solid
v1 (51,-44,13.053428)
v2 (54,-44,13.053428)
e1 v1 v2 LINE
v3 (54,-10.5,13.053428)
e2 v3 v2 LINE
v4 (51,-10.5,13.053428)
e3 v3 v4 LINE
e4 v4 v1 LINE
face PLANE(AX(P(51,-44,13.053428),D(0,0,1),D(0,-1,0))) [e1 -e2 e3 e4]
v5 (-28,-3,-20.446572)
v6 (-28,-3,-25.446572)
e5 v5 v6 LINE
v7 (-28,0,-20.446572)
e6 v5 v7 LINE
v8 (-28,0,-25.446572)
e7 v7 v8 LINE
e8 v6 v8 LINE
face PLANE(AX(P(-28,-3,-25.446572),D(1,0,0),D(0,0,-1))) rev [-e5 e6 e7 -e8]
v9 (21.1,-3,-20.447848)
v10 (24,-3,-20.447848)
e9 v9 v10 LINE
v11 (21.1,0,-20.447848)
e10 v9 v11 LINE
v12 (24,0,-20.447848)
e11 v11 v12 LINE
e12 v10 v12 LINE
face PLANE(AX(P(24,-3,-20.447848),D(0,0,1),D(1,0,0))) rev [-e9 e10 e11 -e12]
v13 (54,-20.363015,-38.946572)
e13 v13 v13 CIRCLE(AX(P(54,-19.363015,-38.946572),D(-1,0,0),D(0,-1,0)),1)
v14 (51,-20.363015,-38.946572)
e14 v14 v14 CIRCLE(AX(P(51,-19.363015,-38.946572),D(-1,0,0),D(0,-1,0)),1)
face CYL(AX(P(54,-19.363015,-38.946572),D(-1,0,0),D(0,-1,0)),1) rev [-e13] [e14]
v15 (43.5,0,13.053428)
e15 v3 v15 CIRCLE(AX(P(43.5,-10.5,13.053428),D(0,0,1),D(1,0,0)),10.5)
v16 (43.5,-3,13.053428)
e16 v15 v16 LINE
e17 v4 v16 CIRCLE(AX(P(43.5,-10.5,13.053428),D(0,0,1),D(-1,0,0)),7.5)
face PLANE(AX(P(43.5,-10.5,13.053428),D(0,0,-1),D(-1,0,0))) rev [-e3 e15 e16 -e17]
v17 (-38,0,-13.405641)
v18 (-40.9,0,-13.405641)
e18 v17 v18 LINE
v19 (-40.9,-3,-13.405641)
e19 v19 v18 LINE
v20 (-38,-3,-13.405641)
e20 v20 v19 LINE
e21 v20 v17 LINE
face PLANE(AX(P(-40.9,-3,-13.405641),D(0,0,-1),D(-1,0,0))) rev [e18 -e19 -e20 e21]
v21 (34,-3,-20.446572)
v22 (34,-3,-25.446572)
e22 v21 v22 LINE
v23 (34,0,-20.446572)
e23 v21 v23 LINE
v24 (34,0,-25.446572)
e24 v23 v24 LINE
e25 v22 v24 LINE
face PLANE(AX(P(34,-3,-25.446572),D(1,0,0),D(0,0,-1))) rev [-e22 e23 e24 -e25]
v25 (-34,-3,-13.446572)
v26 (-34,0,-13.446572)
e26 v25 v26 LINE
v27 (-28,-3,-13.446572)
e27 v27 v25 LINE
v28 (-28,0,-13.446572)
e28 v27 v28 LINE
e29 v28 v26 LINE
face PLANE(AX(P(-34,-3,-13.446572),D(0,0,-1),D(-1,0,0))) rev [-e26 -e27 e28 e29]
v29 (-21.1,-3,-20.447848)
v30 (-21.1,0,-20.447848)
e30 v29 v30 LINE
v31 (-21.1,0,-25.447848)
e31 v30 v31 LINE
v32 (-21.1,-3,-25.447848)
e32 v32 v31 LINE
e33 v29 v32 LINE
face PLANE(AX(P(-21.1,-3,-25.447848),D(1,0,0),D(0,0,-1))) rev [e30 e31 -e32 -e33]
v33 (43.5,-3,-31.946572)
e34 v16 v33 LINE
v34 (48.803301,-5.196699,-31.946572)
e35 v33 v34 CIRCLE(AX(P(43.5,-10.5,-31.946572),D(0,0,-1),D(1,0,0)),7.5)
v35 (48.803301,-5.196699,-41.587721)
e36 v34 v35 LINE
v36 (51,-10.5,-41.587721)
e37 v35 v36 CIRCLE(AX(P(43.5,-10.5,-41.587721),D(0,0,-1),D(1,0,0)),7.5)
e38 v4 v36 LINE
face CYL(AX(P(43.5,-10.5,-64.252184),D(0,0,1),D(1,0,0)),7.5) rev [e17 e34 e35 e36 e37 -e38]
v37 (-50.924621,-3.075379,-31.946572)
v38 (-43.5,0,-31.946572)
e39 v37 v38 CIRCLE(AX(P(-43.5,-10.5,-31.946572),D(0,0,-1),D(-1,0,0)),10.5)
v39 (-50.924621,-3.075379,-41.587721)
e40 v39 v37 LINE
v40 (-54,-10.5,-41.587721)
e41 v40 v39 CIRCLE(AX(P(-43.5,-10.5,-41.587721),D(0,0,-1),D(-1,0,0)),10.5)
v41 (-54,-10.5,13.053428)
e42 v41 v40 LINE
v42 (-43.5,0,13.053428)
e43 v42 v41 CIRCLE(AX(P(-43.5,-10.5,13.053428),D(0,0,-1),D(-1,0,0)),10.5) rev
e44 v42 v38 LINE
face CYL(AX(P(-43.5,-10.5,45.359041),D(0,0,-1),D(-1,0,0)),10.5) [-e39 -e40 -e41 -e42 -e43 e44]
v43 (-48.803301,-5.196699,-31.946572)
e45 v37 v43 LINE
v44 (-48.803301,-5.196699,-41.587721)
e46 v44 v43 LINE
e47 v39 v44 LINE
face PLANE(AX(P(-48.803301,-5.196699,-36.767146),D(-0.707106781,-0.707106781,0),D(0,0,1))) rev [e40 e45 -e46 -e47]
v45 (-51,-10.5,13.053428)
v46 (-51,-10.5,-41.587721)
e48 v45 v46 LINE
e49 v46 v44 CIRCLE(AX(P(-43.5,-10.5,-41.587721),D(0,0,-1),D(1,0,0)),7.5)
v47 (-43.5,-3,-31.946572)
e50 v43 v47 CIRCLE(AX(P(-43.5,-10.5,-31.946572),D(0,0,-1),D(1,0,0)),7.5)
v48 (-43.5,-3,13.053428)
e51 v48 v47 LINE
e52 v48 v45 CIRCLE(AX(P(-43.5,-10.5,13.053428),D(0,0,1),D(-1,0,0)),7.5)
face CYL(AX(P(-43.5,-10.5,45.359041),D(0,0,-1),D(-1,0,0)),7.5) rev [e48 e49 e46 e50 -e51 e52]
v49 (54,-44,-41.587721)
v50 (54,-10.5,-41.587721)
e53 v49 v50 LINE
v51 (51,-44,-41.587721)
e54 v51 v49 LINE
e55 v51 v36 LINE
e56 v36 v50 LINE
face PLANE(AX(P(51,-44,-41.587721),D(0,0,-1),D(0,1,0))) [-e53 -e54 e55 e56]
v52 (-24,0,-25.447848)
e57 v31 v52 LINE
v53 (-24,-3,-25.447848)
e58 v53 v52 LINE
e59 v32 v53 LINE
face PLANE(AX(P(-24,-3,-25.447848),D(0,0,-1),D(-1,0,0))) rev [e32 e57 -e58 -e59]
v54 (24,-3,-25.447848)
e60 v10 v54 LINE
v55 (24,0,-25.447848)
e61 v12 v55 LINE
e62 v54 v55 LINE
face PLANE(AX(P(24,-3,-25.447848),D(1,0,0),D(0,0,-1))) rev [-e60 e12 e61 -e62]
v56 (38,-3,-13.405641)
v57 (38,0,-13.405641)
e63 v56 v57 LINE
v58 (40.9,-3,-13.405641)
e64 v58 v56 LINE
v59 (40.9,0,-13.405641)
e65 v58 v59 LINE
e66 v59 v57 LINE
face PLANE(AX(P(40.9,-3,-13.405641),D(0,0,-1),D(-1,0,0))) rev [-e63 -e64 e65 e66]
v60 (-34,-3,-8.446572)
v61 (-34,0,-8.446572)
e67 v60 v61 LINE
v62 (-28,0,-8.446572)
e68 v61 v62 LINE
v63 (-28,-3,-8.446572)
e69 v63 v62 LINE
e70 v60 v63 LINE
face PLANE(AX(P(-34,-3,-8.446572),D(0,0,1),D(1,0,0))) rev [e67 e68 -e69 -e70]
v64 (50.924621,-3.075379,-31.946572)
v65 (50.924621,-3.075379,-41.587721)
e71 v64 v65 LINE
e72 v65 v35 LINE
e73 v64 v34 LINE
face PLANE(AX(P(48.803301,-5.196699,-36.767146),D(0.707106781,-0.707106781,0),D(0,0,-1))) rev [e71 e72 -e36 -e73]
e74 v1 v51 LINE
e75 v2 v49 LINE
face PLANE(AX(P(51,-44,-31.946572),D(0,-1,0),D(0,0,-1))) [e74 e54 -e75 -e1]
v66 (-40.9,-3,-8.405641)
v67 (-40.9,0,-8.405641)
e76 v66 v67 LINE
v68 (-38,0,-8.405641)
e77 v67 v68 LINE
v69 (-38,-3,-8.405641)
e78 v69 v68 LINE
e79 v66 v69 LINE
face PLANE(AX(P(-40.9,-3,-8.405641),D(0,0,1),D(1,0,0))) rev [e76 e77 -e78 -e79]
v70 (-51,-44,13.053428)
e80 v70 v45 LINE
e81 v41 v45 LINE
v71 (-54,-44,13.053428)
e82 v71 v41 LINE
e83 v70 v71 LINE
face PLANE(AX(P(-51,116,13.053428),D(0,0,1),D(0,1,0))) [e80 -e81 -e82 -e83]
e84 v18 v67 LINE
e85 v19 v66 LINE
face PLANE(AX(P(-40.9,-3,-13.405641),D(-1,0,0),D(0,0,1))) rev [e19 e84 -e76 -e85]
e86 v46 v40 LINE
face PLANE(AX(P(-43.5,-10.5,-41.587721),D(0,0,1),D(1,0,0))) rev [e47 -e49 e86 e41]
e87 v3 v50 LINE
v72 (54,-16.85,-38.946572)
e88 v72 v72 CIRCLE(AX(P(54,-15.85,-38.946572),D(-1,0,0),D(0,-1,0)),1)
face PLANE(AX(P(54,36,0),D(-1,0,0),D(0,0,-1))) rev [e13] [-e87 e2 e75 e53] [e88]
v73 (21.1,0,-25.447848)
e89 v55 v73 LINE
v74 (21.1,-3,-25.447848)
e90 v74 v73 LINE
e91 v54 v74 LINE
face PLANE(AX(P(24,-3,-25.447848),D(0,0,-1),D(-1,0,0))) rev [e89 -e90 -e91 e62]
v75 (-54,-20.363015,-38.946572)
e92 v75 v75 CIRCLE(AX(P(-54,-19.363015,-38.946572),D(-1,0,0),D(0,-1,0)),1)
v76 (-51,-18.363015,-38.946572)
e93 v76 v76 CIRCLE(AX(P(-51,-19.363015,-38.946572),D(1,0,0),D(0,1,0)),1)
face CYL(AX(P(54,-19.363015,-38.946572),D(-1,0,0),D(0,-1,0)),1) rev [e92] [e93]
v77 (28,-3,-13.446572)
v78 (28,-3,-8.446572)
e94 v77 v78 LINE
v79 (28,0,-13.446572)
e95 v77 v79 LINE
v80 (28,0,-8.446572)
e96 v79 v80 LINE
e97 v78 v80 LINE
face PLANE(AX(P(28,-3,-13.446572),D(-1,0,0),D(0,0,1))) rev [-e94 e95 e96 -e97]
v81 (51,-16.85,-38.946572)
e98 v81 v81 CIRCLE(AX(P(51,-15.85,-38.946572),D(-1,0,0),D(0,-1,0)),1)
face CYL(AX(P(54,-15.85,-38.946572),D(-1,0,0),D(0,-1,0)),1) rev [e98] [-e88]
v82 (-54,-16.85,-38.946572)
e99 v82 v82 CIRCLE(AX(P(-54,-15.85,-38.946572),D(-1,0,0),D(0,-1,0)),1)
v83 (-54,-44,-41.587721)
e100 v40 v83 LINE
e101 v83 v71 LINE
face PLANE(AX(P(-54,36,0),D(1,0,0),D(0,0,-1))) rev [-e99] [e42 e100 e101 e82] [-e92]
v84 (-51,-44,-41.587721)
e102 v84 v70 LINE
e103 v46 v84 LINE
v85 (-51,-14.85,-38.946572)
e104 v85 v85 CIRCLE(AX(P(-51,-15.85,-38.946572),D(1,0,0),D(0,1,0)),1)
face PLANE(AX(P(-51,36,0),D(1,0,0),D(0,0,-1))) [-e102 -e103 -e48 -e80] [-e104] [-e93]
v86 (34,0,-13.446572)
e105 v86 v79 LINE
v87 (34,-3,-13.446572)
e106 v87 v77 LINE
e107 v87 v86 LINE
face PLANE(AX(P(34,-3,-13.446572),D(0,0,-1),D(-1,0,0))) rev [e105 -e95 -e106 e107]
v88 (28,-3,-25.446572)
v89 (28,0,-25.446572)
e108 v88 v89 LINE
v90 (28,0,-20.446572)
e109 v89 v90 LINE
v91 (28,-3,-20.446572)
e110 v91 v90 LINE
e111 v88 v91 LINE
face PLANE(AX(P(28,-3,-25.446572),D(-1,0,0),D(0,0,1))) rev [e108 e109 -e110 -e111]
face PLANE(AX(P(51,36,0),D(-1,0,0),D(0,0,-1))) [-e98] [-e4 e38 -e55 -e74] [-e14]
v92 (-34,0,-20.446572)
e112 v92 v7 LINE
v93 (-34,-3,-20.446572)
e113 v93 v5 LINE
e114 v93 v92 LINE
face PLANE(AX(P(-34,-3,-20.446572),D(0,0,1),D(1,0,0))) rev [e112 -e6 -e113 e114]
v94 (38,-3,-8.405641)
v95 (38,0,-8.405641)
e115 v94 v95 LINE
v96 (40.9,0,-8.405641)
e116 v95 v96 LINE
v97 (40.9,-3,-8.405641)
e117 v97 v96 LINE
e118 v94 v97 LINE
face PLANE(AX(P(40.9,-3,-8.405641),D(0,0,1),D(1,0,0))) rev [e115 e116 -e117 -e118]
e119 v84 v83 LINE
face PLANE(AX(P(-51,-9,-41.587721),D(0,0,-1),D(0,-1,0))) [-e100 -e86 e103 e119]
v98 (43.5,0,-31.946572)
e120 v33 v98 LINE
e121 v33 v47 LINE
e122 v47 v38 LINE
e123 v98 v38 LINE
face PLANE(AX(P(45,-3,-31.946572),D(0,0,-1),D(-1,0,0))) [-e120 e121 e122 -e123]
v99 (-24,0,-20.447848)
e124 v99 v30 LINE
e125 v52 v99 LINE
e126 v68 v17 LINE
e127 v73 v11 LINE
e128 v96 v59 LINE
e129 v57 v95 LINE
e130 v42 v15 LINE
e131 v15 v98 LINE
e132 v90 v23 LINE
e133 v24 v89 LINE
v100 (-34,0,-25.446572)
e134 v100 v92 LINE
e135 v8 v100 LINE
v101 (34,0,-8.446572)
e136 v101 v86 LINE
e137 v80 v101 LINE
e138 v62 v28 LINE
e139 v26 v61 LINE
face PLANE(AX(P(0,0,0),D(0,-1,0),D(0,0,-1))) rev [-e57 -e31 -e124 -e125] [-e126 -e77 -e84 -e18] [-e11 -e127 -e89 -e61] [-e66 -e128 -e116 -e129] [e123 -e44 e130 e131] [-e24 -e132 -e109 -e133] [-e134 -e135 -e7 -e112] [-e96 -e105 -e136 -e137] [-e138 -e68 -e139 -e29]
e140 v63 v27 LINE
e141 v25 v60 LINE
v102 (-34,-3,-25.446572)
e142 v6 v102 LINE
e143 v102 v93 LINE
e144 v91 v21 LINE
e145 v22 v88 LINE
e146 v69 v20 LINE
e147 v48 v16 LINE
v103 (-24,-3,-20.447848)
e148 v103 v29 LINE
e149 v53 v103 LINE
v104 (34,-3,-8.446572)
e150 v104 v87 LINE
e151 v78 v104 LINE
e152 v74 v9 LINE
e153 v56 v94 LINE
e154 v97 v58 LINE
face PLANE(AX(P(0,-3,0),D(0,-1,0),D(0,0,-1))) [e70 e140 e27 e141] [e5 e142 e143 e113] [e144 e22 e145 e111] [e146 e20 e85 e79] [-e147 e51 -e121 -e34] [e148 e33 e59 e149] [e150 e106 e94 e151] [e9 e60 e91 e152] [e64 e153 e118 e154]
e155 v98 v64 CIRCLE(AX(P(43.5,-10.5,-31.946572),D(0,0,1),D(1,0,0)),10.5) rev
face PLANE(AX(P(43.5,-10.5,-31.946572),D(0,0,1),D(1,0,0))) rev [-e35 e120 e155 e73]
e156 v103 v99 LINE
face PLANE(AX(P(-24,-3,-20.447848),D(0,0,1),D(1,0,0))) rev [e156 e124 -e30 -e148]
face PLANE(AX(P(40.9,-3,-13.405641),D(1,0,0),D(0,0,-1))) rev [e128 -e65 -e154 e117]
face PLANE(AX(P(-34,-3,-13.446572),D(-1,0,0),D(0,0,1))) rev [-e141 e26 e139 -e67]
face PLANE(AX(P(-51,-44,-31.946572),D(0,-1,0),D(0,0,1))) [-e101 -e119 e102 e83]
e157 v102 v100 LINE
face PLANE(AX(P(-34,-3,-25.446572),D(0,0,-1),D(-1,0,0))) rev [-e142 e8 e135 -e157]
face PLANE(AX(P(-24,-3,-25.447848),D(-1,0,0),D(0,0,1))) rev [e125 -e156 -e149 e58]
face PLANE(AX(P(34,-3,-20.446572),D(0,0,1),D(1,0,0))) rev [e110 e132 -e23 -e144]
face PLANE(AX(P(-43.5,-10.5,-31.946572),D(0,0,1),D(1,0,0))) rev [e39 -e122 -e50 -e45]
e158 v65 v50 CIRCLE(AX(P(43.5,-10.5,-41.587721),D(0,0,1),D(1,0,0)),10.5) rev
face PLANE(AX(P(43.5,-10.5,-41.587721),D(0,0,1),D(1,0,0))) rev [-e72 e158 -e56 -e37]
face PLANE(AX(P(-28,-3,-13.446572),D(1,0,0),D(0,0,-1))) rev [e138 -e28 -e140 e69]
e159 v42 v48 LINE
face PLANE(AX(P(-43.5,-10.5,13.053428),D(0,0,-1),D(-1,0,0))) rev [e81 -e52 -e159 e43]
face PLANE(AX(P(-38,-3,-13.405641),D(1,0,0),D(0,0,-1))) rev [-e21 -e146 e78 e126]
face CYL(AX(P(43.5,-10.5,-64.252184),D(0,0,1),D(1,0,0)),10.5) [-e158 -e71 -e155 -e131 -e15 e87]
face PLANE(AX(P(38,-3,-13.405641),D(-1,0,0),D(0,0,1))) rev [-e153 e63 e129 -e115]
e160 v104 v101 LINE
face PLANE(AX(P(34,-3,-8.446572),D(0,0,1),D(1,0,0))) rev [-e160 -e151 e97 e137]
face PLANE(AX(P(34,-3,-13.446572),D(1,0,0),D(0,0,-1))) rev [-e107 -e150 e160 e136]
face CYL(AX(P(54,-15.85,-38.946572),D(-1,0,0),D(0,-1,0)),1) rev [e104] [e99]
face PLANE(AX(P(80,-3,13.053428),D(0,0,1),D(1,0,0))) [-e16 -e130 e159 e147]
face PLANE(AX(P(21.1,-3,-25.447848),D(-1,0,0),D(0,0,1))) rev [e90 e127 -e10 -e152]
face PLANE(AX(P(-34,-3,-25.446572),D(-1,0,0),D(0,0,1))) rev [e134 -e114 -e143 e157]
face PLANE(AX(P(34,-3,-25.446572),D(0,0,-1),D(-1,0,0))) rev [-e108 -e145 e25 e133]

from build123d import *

# Parameters (mm, degrees)
SKETCH1_W               = 2.9
SKETCH1_H               = 5
SKETCH1_W_2             = 6
BASE_FLANGE1_DEPTH      = 3
SKETCHED_START          = -41.587720567
SKETCHED_BEND1_DEPTH    = 54.641148945
SKETCHED_BEND1_2_DEPTH  = 9.641148945
SKETCHED_BEND1_3_DEPTH  = 54.641148945
SKETCHED_START_2        = -31.946571622
SKETCHED_BEND1_4_DEPTH  = 45
CUT_EXTRUDE2_DEPTH      = 122.204531689
CUT_EXTRUDE2_DEPTH_BACK = 122.204531689
SKETCH32_R              = 1


# Read off the part's stored shape, not the designer's step: Sketched Bend1
# Sheet-metal steps are written as plain solids
with BuildPart() as part:
    # Sketch1 → Base-Flange1 (new body)
    with BuildSketch(Plane(origin=(0, 0, 0), x_dir=(1, 0, 0), z_dir=(0, 1, 0))):
        Polygon((-80, 31.946571622), (-80, -13.053428378), (80, -13.053428378), (80, 31.946571622), (80, 41.587720567), (45, 41.587720567), (45, 31.946571622), (-45, 31.946571622), (-45, 41.587720567), (-80, 41.587720567), align=None)
        with Locations((-39.45, 10.905641405)):
            Rectangle(SKETCH1_W, SKETCH1_H, mode=Mode.SUBTRACT)
        with Locations((-22.55, 22.947848405)):
            Rectangle(SKETCH1_W, SKETCH1_H, mode=Mode.SUBTRACT)
        with Locations((-31, 22.946571622)):
            Rectangle(SKETCH1_W_2, SKETCH1_H, mode=Mode.SUBTRACT)
        with Locations((-31, 10.946571622)):
            Rectangle(SKETCH1_W_2, SKETCH1_H, mode=Mode.SUBTRACT)
        with Locations((31, 10.946571622)):
            Rectangle(SKETCH1_W_2, SKETCH1_H, mode=Mode.SUBTRACT)
        with Locations((31, 22.946571622)):
            Rectangle(SKETCH1_W_2, SKETCH1_H, mode=Mode.SUBTRACT)
        with Locations((22.55, 22.947848405)):
            Rectangle(SKETCH1_W, SKETCH1_H, mode=Mode.SUBTRACT)
        with Locations((39.45, 10.905641405)):
            Rectangle(SKETCH1_W, SKETCH1_H, mode=Mode.SUBTRACT)
    extrude(amount=-BASE_FLANGE1_DEPTH)

    # Sketched Bend1 outline → Sketched Bend1 (cut)
    with BuildSketch(Plane.XY.offset(SKETCHED_START)):
        with BuildLine():
            Line((50.848469227, -3), (80, -3))
            Line((80, -3), (80, 0))
            Line((80, 0), (43.5, 0))
            ThreePointArc((43.5, 0), (47.468626966, -0.778888953), (50.848469227, -3))
        make_face()
        with BuildLine():
            Line((-43.5, 0), (-80, 0))
            Line((-80, 0), (-80, -3))
            Line((-80, -3), (-50.848469227, -3))
            ThreePointArc((-50.848469227, -3), (-47.468626966, -0.778888953), (-43.5, 0))
        make_face()
    extrude(amount=SKETCHED_BEND1_DEPTH, mode=Mode.SUBTRACT)

    # Sketched Bend1 2 outline → Sketched Bend1 2 (cut)
    with BuildSketch(Plane.XY.offset(SKETCHED_START)):
        with BuildLine():
            Line((45, -3), (50.848469227, -3))
            ThreePointArc((50.848469227, -3), (48.154590073, -1.088050614), (45, -0.107695155))
            Line((45, -0.107695155), (45, -3))
        make_face()
        with BuildLine():
            Line((-50.848469227, -3), (-45, -3))
            Line((-45, -3), (-45, -0.107695155))
            ThreePointArc((-45, -0.107695155), (-48.154590073, -1.088050614), (-50.848469227, -3))
        make_face()
    extrude(amount=SKETCHED_BEND1_2_DEPTH, mode=Mode.SUBTRACT)



with BuildPart() as body_2:
    # Sketched Bend1 3 outline → Sketched Bend1 3 (new body)
    with BuildSketch(Plane.XY.offset(SKETCHED_START)):
        with BuildLine():
            Line((50.924621202, -3.075378798), (48.803300859, -5.196699141))
            ThreePointArc((48.803300859, -5.196699141), (50.429096494, -7.629874257), (51, -10.5))
            Line((51, -10.5), (51, -44))
            Line((51, -44), (54, -44))
            Line((54, -44), (54, -10.5))
            ThreePointArc((54, -10.5), (53.200735091, -6.48182396), (50.924621202, -3.075378798))
        make_face()
        with BuildLine():
            ThreePointArc((-51, -10.5), (-50.429096494, -7.629874257), (-48.803300859, -5.196699141))
            Line((-48.803300859, -5.196699141), (-50.924621202, -3.075378798))
            ThreePointArc((-50.924621202, -3.075378798), (-53.200735091, -6.48182396), (-54, -10.5))
            Line((-54, -10.5), (-54, -44))
            Line((-54, -44), (-51, -44))
            Line((-51, -44), (-51, -10.5))
        make_face()
    extrude(amount=SKETCHED_BEND1_3_DEPTH)


with BuildPart() as part_1:
    add(part.part)

    add(body_2.part)  # Sketched Bend1 4 merges body 2
    # Sketched Bend1 4 outline → Sketched Bend1 4 (add)
    with BuildSketch(Plane.XY.offset(SKETCHED_START_2)):
        with BuildLine():
            ThreePointArc((43.5, -3), (46.370125743, -3.570903506), (48.803300859, -5.196699141))
            Line((48.803300859, -5.196699141), (50.924621202, -3.075378798))
            ThreePointArc((50.924621202, -3.075378798), (50.886641368, -3.037592259), (50.848469227, -3))
            Line((50.848469227, -3), (43.5, -3))
        make_face()
        with BuildLine():
            ThreePointArc((-48.803300859, -5.196699141), (-46.370125743, -3.570903506), (-43.5, -3))
            Line((-43.5, -3), (-50.848469227, -3))
            ThreePointArc((-50.848469227, -3), (-50.886641368, -3.037592259), (-50.924621202, -3.075378798))
            Line((-50.924621202, -3.075378798), (-48.803300859, -5.196699141))
        make_face()
    extrude(amount=SKETCHED_BEND1_4_DEPTH)

    # Sketch32 → Cut-Extrude2 (cut, two sides: drawn at the far end of the back side and taken through both)
    with BuildSketch(Plane.ZY.offset(-51).offset(-CUT_EXTRUDE2_DEPTH_BACK)):
        with Locations(Location((-38.946571622, -19.363015099, 0), (0, 0, 270))):
            Circle(SKETCH32_R)
        with Locations(Location((-38.946571622, -15.85, 0), (0, 0, 270))):
            Circle(SKETCH32_R)
    extrude(amount=CUT_EXTRUDE2_DEPTH + CUT_EXTRUDE2_DEPTH_BACK, mode=Mode.SUBTRACT)


solid = part_1.part
